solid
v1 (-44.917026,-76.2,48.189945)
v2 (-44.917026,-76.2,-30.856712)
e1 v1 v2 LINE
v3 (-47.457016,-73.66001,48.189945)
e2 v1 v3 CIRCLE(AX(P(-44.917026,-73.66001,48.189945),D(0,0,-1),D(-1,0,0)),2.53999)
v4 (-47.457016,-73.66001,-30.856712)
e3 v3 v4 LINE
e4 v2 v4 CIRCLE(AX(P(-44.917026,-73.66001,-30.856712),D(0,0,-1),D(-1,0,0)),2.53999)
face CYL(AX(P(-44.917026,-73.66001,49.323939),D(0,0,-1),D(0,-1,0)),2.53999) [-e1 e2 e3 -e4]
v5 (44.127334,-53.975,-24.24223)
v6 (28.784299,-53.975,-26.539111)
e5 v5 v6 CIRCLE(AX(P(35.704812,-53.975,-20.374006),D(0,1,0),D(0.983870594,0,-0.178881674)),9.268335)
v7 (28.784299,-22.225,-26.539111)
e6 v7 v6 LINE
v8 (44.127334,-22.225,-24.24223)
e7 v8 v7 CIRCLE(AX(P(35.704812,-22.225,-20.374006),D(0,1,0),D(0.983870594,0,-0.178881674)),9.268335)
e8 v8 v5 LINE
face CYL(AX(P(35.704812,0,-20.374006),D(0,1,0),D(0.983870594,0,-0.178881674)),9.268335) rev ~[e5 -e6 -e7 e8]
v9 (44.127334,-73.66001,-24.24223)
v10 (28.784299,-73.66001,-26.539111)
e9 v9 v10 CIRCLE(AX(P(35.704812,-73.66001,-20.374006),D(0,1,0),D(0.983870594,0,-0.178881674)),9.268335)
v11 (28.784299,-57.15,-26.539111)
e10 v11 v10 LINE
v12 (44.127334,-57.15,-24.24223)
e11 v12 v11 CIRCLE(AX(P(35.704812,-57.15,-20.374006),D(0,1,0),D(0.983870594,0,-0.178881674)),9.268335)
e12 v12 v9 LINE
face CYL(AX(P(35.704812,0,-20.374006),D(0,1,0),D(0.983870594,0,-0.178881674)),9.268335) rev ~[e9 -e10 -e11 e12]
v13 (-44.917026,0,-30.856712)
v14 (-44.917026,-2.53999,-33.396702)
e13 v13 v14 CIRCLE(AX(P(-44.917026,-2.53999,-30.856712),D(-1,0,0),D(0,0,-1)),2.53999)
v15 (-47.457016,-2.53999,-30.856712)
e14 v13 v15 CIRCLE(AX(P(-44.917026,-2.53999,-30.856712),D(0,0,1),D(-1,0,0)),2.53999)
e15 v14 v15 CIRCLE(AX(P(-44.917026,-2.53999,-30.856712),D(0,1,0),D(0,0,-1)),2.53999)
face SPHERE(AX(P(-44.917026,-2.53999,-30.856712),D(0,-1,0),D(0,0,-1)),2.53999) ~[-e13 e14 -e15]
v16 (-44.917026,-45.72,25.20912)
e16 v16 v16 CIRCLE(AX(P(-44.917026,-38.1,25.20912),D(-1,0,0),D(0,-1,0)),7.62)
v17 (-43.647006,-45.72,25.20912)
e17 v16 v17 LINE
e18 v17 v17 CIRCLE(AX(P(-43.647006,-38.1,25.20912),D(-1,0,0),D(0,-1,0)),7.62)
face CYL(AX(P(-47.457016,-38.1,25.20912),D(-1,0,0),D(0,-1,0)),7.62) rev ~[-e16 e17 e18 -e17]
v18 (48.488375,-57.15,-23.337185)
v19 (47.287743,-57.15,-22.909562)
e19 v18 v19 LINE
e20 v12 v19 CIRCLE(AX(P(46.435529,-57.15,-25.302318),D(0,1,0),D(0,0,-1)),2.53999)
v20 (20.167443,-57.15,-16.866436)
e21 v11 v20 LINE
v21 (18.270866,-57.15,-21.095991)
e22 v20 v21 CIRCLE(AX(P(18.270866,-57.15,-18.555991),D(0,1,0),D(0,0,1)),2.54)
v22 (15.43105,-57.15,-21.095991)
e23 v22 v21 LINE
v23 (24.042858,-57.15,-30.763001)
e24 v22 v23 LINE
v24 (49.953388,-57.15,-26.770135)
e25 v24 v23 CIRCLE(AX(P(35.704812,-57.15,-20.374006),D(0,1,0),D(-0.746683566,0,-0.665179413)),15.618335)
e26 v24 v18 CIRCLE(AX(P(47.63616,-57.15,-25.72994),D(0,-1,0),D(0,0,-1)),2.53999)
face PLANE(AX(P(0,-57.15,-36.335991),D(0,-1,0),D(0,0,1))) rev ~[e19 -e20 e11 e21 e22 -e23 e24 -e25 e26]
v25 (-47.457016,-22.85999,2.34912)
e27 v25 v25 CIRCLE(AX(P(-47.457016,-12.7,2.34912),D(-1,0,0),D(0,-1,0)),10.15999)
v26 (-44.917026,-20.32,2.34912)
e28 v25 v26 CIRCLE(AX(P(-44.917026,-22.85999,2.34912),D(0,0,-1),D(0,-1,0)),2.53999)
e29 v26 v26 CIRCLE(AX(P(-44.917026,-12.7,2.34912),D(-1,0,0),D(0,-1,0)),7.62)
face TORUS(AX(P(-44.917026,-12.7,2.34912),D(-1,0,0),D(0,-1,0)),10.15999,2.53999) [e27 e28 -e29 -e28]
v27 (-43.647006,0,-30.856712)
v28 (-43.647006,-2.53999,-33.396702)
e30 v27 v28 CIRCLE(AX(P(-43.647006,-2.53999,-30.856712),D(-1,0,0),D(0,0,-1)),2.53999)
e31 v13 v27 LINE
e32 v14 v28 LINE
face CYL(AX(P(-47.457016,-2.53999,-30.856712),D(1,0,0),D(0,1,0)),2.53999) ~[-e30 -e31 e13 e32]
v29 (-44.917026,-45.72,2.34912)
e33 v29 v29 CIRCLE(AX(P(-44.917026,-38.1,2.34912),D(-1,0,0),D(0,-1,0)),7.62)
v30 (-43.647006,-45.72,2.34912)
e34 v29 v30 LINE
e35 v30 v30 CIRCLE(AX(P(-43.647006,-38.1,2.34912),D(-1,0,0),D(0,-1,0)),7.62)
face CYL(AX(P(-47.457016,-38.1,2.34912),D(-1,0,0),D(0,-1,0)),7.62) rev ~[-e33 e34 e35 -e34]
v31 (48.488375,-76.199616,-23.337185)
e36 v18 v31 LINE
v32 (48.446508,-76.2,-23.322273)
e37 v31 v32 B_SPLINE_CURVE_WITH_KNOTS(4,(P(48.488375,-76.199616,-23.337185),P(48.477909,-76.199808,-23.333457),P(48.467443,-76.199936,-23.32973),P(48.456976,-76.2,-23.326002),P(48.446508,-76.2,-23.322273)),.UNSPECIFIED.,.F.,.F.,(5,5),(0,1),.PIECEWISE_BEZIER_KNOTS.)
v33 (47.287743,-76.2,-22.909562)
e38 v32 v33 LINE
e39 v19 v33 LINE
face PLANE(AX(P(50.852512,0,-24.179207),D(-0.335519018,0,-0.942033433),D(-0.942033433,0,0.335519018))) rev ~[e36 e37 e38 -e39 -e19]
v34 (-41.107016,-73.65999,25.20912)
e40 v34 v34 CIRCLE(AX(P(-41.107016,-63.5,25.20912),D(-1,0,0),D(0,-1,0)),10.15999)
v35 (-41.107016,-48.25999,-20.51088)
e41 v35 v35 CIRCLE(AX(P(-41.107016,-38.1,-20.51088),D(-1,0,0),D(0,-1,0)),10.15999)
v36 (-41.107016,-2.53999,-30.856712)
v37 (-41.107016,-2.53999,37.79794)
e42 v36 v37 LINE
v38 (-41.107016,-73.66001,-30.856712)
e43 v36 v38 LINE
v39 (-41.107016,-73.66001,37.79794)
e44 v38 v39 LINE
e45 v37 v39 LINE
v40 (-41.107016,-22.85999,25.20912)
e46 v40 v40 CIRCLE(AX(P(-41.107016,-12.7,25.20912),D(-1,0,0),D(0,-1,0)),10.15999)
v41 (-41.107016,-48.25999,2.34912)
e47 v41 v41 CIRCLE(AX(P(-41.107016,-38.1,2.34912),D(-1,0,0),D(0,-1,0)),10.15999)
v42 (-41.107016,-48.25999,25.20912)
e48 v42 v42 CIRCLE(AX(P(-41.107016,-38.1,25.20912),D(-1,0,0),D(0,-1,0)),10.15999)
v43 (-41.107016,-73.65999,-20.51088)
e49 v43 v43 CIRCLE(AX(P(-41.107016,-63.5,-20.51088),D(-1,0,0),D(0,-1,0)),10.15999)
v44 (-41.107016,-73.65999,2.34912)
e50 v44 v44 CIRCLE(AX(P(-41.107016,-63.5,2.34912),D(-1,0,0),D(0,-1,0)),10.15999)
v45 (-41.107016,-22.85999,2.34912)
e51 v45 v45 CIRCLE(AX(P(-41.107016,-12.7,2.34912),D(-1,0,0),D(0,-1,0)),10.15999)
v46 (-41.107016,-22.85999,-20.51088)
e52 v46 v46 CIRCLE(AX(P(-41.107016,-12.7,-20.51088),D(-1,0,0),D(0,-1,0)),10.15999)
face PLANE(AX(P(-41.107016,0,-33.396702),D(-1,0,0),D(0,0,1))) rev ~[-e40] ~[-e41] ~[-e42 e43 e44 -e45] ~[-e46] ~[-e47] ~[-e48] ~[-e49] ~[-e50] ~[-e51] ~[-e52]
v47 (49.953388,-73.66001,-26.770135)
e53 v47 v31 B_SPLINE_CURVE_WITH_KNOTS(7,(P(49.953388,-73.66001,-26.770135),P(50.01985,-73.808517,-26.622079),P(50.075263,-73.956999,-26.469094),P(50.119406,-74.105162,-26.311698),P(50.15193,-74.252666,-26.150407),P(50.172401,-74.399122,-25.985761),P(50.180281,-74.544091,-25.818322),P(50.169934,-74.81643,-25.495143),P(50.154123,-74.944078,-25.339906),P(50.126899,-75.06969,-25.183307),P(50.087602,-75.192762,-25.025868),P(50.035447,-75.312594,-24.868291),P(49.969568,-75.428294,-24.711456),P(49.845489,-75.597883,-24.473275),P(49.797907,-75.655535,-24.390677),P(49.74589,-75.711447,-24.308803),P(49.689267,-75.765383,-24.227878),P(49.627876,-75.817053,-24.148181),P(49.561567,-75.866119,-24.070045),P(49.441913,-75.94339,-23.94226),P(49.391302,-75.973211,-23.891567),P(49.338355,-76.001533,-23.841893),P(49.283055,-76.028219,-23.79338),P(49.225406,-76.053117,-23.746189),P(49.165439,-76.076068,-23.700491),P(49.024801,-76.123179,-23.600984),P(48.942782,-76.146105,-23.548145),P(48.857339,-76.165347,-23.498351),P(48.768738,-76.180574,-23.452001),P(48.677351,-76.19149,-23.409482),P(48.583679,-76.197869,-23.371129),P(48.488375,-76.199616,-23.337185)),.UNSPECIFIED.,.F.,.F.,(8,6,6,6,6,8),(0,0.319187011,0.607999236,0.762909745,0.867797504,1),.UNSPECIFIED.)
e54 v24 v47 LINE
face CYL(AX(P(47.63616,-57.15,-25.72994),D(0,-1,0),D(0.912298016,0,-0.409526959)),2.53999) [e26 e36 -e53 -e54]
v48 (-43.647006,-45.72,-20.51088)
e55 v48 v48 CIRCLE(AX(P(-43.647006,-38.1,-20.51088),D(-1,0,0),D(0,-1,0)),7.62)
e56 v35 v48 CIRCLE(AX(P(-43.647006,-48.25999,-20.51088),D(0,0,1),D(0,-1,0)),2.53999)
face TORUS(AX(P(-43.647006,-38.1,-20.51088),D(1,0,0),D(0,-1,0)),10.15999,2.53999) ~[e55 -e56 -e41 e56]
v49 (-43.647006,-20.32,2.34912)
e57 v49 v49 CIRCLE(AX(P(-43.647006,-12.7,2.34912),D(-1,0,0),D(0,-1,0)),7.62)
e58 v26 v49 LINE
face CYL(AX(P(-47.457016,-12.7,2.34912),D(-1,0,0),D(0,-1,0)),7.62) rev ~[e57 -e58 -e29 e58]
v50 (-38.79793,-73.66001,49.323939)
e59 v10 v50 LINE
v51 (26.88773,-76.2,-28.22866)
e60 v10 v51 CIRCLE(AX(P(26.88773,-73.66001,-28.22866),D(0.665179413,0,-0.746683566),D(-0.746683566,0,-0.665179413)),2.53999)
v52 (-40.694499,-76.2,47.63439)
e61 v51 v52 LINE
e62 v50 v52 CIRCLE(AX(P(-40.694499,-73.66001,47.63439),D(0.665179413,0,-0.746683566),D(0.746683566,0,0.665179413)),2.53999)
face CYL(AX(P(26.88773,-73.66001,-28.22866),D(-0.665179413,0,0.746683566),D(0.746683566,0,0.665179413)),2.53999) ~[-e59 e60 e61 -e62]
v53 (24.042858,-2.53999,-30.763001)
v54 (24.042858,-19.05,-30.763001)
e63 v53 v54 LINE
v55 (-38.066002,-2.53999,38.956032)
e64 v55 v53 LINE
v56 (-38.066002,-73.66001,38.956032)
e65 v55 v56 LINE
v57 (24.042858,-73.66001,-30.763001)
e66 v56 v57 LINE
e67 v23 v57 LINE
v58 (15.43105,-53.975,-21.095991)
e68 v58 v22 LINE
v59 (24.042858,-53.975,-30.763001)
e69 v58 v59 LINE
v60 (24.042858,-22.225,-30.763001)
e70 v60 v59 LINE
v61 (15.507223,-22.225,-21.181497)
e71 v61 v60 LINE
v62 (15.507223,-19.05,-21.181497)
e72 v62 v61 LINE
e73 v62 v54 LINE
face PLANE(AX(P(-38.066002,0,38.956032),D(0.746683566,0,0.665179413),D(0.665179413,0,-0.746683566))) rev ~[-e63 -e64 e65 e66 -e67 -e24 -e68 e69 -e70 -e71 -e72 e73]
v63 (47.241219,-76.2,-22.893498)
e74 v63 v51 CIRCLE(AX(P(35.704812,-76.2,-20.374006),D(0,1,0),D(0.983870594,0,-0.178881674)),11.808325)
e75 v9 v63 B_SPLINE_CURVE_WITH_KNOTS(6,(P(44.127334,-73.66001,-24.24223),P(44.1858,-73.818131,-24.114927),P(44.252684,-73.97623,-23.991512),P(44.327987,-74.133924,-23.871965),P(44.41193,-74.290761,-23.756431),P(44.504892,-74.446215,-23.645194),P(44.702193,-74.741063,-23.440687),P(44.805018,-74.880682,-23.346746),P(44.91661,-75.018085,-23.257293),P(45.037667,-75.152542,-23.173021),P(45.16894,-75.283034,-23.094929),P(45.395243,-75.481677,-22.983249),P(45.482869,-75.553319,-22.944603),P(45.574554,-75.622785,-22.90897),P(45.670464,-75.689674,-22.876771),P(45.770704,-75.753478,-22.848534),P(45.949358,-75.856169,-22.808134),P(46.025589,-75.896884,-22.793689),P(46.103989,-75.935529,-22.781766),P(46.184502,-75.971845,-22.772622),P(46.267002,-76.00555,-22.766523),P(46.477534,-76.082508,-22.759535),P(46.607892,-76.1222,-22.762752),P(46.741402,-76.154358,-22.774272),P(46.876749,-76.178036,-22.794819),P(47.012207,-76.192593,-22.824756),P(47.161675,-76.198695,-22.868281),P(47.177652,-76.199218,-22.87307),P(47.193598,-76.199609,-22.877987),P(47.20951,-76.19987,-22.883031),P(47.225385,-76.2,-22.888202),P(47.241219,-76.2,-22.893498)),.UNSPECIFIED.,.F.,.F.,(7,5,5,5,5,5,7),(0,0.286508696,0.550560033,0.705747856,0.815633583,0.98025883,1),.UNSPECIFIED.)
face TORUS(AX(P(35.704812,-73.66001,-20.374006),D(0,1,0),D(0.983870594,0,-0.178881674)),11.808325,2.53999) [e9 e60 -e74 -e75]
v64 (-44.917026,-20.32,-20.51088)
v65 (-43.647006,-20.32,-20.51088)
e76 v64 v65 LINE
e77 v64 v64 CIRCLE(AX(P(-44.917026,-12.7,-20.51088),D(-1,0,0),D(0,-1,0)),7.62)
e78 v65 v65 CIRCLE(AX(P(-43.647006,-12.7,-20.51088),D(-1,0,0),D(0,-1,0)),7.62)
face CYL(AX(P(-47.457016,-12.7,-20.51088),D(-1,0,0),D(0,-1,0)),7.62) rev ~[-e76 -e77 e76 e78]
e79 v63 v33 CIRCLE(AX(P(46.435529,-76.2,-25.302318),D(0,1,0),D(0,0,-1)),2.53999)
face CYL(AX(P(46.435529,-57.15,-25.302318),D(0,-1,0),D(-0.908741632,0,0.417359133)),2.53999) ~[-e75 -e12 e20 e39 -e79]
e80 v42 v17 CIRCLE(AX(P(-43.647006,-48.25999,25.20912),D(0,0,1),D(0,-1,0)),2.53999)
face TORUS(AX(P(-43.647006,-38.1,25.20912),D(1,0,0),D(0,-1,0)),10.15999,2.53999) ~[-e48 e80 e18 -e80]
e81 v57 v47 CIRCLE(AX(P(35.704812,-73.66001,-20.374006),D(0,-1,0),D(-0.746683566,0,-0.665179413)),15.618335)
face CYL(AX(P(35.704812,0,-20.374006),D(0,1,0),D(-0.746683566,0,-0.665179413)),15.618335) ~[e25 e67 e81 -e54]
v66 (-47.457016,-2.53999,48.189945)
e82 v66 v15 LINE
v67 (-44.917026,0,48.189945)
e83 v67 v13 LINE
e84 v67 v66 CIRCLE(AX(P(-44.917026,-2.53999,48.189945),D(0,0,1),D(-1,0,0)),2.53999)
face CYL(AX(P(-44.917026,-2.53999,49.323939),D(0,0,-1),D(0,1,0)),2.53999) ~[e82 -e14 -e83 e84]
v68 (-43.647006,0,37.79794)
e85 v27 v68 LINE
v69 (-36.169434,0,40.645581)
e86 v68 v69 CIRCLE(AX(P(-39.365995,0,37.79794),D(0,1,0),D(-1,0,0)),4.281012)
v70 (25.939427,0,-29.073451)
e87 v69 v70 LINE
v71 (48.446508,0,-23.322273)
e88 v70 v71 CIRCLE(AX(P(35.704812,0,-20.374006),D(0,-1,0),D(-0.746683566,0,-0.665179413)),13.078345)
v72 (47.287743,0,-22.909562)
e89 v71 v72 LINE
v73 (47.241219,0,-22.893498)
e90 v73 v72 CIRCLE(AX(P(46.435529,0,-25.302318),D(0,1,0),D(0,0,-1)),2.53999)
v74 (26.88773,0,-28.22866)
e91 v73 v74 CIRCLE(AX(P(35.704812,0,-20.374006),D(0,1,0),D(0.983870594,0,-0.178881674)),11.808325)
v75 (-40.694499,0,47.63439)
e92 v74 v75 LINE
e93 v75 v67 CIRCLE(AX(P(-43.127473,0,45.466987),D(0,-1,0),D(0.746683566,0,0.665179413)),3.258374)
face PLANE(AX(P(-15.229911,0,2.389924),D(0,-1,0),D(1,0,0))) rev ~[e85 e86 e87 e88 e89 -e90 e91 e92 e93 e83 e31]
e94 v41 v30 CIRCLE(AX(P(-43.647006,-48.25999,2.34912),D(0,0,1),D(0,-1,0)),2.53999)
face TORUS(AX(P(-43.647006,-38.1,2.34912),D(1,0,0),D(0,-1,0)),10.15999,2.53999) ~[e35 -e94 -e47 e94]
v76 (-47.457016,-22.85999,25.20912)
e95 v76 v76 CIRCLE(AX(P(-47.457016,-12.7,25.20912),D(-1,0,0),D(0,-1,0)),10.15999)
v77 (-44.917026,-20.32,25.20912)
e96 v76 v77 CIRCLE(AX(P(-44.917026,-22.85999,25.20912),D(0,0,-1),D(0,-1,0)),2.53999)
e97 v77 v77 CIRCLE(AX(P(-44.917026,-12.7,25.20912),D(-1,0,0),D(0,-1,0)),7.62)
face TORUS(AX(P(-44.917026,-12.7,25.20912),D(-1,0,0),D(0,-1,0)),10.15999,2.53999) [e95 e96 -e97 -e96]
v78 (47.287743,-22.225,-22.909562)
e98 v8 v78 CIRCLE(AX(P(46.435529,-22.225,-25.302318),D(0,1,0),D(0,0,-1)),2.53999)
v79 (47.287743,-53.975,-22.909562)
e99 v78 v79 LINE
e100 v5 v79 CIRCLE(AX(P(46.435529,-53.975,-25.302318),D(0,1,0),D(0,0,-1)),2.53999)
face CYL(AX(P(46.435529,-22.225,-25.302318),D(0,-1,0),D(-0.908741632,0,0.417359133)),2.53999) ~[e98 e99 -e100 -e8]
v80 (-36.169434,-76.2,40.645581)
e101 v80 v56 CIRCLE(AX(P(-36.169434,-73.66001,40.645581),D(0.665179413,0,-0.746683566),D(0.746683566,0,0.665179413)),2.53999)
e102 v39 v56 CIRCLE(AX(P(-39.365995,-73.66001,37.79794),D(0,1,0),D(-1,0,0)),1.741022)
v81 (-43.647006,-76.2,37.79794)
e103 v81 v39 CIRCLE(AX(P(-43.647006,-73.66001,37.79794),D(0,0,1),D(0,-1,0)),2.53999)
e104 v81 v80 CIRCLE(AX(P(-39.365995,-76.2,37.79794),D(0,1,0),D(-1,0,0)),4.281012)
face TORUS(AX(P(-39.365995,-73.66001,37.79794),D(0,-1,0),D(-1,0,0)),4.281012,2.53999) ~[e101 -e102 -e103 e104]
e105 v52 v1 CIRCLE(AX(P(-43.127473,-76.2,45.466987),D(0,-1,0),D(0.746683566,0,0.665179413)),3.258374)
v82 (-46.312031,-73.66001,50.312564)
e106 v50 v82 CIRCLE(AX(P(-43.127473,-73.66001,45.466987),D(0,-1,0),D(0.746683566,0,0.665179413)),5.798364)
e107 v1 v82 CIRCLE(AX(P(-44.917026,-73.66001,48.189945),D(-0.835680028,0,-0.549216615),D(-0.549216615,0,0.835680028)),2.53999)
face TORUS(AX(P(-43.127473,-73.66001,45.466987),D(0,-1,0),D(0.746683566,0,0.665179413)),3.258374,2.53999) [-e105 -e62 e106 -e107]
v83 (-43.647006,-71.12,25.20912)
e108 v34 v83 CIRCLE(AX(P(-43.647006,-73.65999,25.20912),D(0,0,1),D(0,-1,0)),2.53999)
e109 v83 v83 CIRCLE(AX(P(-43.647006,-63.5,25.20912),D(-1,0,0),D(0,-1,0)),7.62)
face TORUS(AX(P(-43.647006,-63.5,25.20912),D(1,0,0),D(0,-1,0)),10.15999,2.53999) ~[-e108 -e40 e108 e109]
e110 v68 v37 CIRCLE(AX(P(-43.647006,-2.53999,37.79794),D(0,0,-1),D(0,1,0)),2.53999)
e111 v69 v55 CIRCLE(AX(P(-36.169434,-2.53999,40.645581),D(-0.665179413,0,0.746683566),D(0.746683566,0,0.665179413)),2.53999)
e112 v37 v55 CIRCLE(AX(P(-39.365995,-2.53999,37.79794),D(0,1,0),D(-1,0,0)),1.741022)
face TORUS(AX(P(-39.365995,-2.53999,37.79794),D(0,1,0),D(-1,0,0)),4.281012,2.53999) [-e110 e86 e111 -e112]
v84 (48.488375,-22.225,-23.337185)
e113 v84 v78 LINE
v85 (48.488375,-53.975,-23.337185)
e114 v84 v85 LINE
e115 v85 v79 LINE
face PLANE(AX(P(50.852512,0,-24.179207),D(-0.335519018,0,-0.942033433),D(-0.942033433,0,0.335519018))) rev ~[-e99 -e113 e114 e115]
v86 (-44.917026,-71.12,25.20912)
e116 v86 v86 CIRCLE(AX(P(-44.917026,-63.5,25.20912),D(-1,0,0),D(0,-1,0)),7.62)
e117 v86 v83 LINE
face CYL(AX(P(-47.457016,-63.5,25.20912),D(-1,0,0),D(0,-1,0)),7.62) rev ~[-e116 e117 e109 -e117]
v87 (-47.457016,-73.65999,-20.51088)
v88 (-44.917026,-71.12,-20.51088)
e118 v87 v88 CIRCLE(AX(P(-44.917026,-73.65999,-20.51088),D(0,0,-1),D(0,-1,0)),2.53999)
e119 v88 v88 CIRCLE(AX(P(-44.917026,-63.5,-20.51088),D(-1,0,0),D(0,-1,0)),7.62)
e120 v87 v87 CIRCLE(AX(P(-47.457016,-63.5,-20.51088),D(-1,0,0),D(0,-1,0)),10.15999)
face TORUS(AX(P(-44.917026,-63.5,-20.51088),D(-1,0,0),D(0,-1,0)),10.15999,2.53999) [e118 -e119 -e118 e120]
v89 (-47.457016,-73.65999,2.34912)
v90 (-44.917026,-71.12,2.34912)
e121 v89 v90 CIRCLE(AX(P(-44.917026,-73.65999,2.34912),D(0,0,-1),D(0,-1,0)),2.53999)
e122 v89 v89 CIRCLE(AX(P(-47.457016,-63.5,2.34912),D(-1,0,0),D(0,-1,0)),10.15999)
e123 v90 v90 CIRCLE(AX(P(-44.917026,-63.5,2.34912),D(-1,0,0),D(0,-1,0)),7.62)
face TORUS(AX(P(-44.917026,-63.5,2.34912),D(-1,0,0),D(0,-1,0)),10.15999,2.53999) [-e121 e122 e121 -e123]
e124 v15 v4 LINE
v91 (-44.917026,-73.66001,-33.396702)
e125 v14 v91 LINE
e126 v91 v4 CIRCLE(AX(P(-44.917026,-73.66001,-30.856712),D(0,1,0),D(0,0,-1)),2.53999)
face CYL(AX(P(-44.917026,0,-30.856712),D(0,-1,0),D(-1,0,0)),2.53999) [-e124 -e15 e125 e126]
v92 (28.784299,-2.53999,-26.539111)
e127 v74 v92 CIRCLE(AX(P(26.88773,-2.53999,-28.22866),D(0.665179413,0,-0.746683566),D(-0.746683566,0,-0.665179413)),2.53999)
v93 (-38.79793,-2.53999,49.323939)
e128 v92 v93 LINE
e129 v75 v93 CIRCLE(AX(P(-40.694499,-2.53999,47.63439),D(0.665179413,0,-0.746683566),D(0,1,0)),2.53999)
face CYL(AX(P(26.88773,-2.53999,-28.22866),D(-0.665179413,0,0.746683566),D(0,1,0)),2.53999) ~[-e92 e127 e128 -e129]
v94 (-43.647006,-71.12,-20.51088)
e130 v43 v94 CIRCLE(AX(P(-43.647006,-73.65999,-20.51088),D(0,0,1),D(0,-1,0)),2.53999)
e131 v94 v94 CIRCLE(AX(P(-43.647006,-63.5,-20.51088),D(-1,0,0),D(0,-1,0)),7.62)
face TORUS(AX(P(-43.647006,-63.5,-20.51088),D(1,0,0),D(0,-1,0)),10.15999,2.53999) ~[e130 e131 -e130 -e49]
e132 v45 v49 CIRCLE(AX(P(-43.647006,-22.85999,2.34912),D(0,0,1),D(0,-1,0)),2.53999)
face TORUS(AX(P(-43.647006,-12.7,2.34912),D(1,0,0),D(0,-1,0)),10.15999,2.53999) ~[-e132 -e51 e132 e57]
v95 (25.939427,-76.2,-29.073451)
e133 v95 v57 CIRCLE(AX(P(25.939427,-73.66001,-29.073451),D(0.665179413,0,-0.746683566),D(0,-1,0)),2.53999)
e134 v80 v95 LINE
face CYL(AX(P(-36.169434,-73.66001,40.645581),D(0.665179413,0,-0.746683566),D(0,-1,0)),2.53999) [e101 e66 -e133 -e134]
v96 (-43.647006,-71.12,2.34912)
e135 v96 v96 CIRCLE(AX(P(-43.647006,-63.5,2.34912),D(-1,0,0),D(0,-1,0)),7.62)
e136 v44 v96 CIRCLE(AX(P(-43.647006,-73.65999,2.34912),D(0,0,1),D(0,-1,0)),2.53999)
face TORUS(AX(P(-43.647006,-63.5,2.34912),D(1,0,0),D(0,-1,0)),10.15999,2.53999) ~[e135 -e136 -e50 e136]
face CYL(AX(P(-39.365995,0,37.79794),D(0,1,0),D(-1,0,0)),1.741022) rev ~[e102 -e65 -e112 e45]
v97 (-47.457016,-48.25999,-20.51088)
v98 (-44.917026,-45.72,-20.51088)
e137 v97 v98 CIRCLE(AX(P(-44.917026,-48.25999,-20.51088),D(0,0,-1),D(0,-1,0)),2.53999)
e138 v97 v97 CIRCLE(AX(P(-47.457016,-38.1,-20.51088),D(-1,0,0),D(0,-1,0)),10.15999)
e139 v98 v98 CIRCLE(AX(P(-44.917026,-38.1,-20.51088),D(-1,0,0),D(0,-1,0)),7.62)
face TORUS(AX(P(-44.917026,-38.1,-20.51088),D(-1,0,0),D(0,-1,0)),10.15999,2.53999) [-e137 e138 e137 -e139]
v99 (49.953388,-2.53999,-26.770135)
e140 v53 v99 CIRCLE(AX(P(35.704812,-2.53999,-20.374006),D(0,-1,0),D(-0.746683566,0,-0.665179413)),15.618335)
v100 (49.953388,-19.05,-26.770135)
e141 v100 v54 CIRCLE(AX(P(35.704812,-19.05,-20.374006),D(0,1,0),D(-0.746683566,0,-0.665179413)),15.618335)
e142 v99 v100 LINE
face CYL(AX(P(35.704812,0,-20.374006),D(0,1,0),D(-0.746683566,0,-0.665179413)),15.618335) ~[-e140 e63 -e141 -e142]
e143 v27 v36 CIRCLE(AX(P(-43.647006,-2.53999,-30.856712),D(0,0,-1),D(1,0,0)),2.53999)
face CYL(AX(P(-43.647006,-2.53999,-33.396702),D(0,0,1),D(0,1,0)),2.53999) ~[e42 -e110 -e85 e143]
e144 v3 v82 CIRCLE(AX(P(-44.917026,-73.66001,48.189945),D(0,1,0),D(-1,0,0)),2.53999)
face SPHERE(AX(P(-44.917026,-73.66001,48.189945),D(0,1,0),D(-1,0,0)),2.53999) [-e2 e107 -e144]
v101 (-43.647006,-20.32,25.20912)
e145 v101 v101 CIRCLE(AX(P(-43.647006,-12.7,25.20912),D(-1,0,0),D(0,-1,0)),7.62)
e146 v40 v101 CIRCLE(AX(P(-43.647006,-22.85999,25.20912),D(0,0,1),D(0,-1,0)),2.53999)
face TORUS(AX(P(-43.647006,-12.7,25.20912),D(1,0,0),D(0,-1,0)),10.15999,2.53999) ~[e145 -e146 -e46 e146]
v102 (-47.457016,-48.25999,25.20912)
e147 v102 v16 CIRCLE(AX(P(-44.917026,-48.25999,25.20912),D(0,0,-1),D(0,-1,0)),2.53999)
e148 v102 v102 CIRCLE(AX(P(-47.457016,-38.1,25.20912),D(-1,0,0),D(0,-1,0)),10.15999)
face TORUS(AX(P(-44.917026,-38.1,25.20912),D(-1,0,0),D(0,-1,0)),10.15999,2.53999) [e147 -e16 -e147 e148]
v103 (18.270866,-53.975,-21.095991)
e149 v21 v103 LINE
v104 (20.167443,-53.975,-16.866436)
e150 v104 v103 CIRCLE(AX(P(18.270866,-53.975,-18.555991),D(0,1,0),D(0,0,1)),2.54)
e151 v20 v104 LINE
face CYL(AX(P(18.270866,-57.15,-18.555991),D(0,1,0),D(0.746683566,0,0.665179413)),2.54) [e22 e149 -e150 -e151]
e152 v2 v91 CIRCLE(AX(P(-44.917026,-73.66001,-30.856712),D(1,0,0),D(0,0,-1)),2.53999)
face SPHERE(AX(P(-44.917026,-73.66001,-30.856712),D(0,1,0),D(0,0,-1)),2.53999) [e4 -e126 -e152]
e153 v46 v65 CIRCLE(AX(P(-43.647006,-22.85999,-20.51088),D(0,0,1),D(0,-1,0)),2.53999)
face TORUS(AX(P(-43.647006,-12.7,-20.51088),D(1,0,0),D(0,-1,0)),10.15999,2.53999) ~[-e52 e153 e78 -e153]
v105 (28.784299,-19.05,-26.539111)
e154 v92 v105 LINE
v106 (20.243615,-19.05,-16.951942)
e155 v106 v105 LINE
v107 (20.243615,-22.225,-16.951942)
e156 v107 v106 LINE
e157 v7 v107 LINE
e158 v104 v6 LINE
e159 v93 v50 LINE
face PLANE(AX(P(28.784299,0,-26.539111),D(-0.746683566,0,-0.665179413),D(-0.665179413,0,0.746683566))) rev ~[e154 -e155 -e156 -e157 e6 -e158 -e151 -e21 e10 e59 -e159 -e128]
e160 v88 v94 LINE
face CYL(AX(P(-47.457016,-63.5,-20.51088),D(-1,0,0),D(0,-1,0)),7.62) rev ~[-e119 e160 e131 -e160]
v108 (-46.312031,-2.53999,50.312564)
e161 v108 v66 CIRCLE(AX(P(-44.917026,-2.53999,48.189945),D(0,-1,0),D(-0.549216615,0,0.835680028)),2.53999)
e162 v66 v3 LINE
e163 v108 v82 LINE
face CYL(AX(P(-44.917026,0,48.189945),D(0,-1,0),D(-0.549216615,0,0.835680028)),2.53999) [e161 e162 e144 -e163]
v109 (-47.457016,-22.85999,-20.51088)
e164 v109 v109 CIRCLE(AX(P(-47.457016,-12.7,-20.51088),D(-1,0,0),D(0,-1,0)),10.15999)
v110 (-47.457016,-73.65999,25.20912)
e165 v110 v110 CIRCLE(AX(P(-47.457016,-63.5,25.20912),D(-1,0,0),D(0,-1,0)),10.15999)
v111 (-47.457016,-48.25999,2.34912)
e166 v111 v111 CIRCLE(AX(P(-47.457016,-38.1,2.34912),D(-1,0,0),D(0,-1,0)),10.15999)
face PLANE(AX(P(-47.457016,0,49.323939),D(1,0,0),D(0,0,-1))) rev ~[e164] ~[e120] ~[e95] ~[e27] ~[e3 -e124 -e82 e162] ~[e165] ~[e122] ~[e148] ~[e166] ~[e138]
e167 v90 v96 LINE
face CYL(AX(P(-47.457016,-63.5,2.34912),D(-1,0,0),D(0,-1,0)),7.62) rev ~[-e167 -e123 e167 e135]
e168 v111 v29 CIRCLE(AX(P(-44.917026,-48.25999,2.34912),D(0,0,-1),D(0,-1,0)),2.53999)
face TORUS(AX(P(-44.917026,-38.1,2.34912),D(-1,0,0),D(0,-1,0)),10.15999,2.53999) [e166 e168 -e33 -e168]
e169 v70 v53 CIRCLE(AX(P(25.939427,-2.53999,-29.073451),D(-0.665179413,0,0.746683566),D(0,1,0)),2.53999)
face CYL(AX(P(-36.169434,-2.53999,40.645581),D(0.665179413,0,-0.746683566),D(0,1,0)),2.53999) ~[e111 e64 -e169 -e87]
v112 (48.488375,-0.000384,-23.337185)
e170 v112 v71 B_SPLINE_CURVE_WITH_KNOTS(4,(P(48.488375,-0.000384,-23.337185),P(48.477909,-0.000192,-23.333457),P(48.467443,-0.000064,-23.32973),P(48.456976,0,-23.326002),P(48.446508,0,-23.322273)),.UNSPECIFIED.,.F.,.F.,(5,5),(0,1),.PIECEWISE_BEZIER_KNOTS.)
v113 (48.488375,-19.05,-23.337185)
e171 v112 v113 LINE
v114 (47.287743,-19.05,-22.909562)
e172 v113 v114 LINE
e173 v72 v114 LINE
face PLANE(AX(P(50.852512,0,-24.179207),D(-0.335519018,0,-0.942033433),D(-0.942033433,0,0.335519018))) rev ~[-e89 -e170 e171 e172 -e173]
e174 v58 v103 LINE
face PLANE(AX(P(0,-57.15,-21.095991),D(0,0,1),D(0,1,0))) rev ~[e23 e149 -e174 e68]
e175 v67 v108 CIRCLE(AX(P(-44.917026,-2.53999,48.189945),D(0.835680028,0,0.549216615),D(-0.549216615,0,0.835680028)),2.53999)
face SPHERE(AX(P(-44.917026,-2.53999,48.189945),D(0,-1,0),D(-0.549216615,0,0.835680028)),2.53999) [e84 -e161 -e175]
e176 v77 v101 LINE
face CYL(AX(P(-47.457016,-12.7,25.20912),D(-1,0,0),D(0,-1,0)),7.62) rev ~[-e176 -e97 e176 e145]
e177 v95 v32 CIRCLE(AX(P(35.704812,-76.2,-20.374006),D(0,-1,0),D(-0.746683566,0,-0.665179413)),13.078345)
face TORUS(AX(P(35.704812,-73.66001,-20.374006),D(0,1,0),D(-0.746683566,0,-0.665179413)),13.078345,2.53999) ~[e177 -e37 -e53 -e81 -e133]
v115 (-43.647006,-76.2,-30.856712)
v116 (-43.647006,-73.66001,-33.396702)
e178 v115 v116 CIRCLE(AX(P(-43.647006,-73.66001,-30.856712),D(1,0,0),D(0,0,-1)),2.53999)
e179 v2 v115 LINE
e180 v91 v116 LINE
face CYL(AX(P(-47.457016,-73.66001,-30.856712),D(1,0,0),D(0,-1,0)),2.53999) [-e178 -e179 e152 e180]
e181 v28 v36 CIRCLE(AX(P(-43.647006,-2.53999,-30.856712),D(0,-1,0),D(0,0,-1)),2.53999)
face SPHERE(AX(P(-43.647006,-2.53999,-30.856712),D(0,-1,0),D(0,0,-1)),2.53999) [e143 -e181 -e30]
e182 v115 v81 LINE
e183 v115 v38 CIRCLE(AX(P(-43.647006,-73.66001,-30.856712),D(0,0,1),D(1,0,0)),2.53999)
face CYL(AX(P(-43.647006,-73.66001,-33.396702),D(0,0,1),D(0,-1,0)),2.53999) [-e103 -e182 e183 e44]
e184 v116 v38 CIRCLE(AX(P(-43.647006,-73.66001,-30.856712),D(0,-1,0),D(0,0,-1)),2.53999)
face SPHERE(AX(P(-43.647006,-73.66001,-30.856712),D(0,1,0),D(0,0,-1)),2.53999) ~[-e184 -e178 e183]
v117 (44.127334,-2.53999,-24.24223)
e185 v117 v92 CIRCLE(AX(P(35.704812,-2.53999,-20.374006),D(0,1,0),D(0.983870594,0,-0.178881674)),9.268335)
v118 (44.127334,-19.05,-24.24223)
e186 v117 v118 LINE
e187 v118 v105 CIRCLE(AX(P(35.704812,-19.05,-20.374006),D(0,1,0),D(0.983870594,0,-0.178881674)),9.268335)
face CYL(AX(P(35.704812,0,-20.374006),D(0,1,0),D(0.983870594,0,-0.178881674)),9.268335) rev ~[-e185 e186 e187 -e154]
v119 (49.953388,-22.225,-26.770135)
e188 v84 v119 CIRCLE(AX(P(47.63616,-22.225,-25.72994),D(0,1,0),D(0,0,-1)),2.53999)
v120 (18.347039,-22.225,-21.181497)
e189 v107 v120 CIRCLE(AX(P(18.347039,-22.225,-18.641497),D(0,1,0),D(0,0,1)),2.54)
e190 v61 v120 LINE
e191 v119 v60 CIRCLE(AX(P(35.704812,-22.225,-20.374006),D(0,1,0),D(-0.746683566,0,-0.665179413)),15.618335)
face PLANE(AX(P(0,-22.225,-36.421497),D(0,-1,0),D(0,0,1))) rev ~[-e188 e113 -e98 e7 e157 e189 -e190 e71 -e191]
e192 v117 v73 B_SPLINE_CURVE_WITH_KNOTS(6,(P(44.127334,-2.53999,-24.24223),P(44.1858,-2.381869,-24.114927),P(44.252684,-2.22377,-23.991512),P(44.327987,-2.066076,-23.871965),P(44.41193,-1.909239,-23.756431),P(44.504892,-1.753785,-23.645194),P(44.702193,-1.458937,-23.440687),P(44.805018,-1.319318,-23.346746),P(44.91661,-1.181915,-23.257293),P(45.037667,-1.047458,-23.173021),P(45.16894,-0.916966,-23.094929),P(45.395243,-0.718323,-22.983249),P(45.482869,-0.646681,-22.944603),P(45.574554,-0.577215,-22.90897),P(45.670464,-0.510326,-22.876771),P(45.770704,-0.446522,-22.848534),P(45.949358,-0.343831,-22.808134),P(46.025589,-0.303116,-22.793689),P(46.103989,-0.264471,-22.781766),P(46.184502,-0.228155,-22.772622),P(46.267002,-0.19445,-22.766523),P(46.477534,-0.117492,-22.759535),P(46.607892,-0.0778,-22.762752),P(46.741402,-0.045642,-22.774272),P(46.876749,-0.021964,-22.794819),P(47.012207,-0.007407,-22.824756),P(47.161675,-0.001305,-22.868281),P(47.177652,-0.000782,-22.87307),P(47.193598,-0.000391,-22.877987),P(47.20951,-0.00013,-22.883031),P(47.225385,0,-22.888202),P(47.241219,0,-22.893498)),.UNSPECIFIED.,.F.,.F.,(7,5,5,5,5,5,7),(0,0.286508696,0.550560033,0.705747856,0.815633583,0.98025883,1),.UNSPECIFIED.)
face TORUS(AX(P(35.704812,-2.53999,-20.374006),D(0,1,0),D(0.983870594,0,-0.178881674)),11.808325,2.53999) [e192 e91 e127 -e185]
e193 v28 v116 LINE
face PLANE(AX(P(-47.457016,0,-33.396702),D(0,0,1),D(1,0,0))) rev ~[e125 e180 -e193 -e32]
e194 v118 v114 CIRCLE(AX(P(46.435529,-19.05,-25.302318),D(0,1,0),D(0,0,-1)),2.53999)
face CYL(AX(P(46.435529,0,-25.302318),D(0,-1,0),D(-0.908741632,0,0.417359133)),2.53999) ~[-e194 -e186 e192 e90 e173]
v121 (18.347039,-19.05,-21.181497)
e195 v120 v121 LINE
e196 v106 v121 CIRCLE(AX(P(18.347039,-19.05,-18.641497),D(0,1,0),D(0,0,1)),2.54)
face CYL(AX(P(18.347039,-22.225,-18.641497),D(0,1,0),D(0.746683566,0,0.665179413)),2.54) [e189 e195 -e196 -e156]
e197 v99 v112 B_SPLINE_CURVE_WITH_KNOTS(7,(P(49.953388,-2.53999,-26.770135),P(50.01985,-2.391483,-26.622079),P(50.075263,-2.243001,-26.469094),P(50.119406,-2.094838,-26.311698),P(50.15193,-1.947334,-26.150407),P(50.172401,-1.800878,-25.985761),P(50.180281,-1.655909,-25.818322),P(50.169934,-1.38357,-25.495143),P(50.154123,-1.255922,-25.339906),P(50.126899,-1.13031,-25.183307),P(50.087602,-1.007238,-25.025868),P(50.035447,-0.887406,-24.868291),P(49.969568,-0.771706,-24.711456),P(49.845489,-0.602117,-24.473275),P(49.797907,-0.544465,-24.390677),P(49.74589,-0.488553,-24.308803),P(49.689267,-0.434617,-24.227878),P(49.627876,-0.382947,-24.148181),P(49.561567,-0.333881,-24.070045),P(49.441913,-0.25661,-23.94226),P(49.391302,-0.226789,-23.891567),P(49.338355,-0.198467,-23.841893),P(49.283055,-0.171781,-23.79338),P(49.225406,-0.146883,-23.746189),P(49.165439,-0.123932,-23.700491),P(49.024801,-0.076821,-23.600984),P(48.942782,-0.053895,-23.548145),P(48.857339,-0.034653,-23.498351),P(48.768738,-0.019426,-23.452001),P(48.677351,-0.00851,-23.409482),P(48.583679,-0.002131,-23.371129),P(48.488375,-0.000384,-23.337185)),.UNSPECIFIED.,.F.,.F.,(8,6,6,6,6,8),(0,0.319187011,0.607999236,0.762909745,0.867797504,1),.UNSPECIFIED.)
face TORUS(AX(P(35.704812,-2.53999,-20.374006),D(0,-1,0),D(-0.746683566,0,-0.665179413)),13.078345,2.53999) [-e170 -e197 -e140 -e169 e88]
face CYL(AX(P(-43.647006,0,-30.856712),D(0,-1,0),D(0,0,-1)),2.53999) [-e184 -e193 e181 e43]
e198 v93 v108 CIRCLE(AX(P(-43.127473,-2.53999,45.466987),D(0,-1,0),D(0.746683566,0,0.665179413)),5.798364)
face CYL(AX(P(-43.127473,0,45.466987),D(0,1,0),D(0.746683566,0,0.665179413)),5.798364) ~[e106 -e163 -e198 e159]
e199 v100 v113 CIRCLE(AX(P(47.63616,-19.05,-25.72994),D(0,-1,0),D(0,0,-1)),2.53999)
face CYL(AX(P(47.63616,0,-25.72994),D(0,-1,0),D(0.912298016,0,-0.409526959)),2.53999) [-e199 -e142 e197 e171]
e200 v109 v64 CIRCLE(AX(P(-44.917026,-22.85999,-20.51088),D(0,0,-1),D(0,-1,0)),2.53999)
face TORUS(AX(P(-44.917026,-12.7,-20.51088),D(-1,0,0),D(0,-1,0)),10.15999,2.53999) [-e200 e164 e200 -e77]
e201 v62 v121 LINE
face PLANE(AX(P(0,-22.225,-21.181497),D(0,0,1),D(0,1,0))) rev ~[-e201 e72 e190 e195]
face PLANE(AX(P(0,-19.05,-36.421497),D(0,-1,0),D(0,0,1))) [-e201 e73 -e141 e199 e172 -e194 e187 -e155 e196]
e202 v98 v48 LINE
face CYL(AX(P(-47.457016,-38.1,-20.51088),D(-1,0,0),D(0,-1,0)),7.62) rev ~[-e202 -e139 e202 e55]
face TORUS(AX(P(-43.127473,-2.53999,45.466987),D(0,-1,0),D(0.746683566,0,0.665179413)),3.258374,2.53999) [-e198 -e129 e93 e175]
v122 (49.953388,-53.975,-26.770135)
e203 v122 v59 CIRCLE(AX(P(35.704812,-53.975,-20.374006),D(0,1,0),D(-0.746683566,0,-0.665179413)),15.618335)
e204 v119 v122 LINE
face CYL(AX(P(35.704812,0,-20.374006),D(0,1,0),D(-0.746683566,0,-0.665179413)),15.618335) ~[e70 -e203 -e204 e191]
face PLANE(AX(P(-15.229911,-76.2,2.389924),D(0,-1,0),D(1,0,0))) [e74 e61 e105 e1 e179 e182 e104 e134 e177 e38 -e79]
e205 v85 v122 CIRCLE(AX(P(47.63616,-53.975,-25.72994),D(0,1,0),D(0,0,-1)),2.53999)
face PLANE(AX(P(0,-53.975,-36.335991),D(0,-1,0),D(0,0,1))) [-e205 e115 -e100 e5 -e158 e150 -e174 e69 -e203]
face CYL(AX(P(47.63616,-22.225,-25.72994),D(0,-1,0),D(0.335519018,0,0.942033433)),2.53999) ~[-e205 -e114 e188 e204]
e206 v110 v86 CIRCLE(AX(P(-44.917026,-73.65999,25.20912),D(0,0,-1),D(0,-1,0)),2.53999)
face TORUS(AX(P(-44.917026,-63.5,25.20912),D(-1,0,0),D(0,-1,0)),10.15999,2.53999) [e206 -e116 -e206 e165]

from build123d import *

# Parameters (mm, degrees)
F1_DEPTH = 76.2
F2_R     = 7.62
F3_DEPTH = 6.35
F4_W     = 3.175
F4_H     = 15.24
F5_DEPTH = 76.2
F6_R     = 2.53999
F7_R     = 2.54


# Not quite as in the source:
# - a fillet or chamfer is up to 0.001 mm smaller than in the source, because OpenCascade refuses the exact size


with BuildPart() as f1:
    # F0 (on Front) → F1 (new body)
    with BuildSketch(Plane.XZ):
        with BuildLine():
            Line((28.7842985747, -26.5391112355), (-38.797929834, 49.323939081))
            ThreePointArc((-38.797929834, 49.323939081), (-43.1274730528, 51.2653507655), (-47.4570162716, 49.323939081))
            Line((-47.4570162716, 49.323939081), (-47.4570162716, -33.3967016697))
            Line((-47.4570162716, -33.3967016697), (-41.1070162716, -33.3967016697))
            Line((-41.1070162716, -33.3967016697), (-41.1070162716, 37.7979404016))
            ThreePointArc((-41.1070162716, 37.7979404016), (-39.9856080884, 39.4249731546), (-38.0660023348, 38.956032174))
            Line((-38.0660023348, 38.956032174), (24.0428579299, -30.763000511))
            ThreePointArc((24.0428579299, -30.763000511), (39.4296194954, -35.5416750714), (50.8525124736, -24.179207116))
            Line((50.8525124736, -24.179207116), (44.8236542685, -22.031940877))
            ThreePointArc((44.8236542685, -22.031940877), (38.2121629119, -29.2967420087), (28.7842985747, -26.5391112355))
        make_face()
    extrude(amount=F1_DEPTH)

    # F2 (on face) → F3 (cut)
    with BuildSketch(Plane(origin=(-47.4570162716, 0, 0), x_dir=(0, -1, 0), z_dir=(-1, 0, 0))):
        with Locations((12.7, -20.5108800562)):
            Circle(F2_R)
        with Locations((38.1, -20.5108800562)):
            Circle(F2_R)
        with Locations((63.5, -20.5108800562)):
            Circle(F2_R)
        with Locations((12.7, 2.3491199438)):
            Circle(F2_R)
        with Locations((38.1, 2.3491199438)):
            Circle(F2_R)
        with Locations((63.5, 2.3491199438)):
            Circle(F2_R)
        with Locations((12.7, 25.2091199438)):
            Circle(F2_R)
        with Locations((38.1, 25.2091199438)):
            Circle(F2_R)
        with Locations((63.5, 25.2091199438)):
            Circle(F2_R)
    extrude(amount=-F3_DEPTH, mode=Mode.SUBTRACT)

    # F4 (on Right) → F5 (cut)
    with BuildSketch(Plane.YZ):
        with Locations((-55.5625, -28.7159914046)):
            Rectangle(F4_W, F4_H)
        with Locations((-20.6375, -28.8014974874)):
            Rectangle(F4_W, F4_H)
    extrude(amount=F5_DEPTH, mode=Mode.SUBTRACT)

    # F6 (radius 2.54 in the source; OpenCascade refuses exactly that, so slightly less here)
    f6_edges = [f1.edges().sort_by_distance(p)[0] for p in [
        (-41.107016, -38.1, -33.396702),
        (-47.457016, -38.1, -33.396702),
        (-44.282016, 0, -33.396702),
        (-44.282016, -76.2, -33.396702),
        (-41.107016, 0, 2.200619),
        (-47.457016, 0, 7.963619),
        (-47.457016, -38.1, 49.323939),
        (-47.457016, -76.2, 7.963619),
        (-41.107016, -76.2, 2.200619),
        (-43.127473, 0, 51.265351),
        (-5.006816, 0, 11.392414),
        (-43.127473, -76.2, 51.265351),
        (50.852512, -38.1, -24.179207),
        (44.823654, -38.1, -22.031941),
        (50.852512, -9.525, -24.179207),
        (44.823654, -9.525, -22.031941),
        (50.852512, -66.675, -24.179207),
        (44.823654, -66.675, -22.031941),
        (-41.107016, -5.08, 2.34912),
        (-41.107016, -5.08, 25.20912),
        (-41.107016, -5.08, -20.51088),
        (-41.107016, -30.48, -20.51088),
        (-41.107016, -30.48, 2.34912),
        (-41.107016, -30.48, 25.20912),
        (-41.107016, -55.88, -20.51088),
        (-41.107016, -55.88, 2.34912),
        (-41.107016, -55.88, 25.20912),
        (-47.457016, -5.08, 25.20912),
        (-47.457016, -30.48, 25.20912),
        (-47.457016, -55.88, 25.20912),
        (-47.457016, -55.88, 2.34912),
        (-47.457016, -30.48, 2.34912),
        (-47.457016, -5.08, 2.34912),
        (-47.457016, -5.08, -20.51088),
        (-47.457016, -30.48, -20.51088),
        (-47.457016, -55.88, -20.51088),
    ]]
    fillet(f6_edges, radius=F6_R)

    # F7
    f7_edges = [f1.edges().sort_by_distance(p)[0] for p in [
        (23.935322, -55.5625, -21.095991),
        (24.011494, -20.6375, -21.181497),
    ]]
    fillet(f7_edges, radius=F7_R)


solid = f1.part
